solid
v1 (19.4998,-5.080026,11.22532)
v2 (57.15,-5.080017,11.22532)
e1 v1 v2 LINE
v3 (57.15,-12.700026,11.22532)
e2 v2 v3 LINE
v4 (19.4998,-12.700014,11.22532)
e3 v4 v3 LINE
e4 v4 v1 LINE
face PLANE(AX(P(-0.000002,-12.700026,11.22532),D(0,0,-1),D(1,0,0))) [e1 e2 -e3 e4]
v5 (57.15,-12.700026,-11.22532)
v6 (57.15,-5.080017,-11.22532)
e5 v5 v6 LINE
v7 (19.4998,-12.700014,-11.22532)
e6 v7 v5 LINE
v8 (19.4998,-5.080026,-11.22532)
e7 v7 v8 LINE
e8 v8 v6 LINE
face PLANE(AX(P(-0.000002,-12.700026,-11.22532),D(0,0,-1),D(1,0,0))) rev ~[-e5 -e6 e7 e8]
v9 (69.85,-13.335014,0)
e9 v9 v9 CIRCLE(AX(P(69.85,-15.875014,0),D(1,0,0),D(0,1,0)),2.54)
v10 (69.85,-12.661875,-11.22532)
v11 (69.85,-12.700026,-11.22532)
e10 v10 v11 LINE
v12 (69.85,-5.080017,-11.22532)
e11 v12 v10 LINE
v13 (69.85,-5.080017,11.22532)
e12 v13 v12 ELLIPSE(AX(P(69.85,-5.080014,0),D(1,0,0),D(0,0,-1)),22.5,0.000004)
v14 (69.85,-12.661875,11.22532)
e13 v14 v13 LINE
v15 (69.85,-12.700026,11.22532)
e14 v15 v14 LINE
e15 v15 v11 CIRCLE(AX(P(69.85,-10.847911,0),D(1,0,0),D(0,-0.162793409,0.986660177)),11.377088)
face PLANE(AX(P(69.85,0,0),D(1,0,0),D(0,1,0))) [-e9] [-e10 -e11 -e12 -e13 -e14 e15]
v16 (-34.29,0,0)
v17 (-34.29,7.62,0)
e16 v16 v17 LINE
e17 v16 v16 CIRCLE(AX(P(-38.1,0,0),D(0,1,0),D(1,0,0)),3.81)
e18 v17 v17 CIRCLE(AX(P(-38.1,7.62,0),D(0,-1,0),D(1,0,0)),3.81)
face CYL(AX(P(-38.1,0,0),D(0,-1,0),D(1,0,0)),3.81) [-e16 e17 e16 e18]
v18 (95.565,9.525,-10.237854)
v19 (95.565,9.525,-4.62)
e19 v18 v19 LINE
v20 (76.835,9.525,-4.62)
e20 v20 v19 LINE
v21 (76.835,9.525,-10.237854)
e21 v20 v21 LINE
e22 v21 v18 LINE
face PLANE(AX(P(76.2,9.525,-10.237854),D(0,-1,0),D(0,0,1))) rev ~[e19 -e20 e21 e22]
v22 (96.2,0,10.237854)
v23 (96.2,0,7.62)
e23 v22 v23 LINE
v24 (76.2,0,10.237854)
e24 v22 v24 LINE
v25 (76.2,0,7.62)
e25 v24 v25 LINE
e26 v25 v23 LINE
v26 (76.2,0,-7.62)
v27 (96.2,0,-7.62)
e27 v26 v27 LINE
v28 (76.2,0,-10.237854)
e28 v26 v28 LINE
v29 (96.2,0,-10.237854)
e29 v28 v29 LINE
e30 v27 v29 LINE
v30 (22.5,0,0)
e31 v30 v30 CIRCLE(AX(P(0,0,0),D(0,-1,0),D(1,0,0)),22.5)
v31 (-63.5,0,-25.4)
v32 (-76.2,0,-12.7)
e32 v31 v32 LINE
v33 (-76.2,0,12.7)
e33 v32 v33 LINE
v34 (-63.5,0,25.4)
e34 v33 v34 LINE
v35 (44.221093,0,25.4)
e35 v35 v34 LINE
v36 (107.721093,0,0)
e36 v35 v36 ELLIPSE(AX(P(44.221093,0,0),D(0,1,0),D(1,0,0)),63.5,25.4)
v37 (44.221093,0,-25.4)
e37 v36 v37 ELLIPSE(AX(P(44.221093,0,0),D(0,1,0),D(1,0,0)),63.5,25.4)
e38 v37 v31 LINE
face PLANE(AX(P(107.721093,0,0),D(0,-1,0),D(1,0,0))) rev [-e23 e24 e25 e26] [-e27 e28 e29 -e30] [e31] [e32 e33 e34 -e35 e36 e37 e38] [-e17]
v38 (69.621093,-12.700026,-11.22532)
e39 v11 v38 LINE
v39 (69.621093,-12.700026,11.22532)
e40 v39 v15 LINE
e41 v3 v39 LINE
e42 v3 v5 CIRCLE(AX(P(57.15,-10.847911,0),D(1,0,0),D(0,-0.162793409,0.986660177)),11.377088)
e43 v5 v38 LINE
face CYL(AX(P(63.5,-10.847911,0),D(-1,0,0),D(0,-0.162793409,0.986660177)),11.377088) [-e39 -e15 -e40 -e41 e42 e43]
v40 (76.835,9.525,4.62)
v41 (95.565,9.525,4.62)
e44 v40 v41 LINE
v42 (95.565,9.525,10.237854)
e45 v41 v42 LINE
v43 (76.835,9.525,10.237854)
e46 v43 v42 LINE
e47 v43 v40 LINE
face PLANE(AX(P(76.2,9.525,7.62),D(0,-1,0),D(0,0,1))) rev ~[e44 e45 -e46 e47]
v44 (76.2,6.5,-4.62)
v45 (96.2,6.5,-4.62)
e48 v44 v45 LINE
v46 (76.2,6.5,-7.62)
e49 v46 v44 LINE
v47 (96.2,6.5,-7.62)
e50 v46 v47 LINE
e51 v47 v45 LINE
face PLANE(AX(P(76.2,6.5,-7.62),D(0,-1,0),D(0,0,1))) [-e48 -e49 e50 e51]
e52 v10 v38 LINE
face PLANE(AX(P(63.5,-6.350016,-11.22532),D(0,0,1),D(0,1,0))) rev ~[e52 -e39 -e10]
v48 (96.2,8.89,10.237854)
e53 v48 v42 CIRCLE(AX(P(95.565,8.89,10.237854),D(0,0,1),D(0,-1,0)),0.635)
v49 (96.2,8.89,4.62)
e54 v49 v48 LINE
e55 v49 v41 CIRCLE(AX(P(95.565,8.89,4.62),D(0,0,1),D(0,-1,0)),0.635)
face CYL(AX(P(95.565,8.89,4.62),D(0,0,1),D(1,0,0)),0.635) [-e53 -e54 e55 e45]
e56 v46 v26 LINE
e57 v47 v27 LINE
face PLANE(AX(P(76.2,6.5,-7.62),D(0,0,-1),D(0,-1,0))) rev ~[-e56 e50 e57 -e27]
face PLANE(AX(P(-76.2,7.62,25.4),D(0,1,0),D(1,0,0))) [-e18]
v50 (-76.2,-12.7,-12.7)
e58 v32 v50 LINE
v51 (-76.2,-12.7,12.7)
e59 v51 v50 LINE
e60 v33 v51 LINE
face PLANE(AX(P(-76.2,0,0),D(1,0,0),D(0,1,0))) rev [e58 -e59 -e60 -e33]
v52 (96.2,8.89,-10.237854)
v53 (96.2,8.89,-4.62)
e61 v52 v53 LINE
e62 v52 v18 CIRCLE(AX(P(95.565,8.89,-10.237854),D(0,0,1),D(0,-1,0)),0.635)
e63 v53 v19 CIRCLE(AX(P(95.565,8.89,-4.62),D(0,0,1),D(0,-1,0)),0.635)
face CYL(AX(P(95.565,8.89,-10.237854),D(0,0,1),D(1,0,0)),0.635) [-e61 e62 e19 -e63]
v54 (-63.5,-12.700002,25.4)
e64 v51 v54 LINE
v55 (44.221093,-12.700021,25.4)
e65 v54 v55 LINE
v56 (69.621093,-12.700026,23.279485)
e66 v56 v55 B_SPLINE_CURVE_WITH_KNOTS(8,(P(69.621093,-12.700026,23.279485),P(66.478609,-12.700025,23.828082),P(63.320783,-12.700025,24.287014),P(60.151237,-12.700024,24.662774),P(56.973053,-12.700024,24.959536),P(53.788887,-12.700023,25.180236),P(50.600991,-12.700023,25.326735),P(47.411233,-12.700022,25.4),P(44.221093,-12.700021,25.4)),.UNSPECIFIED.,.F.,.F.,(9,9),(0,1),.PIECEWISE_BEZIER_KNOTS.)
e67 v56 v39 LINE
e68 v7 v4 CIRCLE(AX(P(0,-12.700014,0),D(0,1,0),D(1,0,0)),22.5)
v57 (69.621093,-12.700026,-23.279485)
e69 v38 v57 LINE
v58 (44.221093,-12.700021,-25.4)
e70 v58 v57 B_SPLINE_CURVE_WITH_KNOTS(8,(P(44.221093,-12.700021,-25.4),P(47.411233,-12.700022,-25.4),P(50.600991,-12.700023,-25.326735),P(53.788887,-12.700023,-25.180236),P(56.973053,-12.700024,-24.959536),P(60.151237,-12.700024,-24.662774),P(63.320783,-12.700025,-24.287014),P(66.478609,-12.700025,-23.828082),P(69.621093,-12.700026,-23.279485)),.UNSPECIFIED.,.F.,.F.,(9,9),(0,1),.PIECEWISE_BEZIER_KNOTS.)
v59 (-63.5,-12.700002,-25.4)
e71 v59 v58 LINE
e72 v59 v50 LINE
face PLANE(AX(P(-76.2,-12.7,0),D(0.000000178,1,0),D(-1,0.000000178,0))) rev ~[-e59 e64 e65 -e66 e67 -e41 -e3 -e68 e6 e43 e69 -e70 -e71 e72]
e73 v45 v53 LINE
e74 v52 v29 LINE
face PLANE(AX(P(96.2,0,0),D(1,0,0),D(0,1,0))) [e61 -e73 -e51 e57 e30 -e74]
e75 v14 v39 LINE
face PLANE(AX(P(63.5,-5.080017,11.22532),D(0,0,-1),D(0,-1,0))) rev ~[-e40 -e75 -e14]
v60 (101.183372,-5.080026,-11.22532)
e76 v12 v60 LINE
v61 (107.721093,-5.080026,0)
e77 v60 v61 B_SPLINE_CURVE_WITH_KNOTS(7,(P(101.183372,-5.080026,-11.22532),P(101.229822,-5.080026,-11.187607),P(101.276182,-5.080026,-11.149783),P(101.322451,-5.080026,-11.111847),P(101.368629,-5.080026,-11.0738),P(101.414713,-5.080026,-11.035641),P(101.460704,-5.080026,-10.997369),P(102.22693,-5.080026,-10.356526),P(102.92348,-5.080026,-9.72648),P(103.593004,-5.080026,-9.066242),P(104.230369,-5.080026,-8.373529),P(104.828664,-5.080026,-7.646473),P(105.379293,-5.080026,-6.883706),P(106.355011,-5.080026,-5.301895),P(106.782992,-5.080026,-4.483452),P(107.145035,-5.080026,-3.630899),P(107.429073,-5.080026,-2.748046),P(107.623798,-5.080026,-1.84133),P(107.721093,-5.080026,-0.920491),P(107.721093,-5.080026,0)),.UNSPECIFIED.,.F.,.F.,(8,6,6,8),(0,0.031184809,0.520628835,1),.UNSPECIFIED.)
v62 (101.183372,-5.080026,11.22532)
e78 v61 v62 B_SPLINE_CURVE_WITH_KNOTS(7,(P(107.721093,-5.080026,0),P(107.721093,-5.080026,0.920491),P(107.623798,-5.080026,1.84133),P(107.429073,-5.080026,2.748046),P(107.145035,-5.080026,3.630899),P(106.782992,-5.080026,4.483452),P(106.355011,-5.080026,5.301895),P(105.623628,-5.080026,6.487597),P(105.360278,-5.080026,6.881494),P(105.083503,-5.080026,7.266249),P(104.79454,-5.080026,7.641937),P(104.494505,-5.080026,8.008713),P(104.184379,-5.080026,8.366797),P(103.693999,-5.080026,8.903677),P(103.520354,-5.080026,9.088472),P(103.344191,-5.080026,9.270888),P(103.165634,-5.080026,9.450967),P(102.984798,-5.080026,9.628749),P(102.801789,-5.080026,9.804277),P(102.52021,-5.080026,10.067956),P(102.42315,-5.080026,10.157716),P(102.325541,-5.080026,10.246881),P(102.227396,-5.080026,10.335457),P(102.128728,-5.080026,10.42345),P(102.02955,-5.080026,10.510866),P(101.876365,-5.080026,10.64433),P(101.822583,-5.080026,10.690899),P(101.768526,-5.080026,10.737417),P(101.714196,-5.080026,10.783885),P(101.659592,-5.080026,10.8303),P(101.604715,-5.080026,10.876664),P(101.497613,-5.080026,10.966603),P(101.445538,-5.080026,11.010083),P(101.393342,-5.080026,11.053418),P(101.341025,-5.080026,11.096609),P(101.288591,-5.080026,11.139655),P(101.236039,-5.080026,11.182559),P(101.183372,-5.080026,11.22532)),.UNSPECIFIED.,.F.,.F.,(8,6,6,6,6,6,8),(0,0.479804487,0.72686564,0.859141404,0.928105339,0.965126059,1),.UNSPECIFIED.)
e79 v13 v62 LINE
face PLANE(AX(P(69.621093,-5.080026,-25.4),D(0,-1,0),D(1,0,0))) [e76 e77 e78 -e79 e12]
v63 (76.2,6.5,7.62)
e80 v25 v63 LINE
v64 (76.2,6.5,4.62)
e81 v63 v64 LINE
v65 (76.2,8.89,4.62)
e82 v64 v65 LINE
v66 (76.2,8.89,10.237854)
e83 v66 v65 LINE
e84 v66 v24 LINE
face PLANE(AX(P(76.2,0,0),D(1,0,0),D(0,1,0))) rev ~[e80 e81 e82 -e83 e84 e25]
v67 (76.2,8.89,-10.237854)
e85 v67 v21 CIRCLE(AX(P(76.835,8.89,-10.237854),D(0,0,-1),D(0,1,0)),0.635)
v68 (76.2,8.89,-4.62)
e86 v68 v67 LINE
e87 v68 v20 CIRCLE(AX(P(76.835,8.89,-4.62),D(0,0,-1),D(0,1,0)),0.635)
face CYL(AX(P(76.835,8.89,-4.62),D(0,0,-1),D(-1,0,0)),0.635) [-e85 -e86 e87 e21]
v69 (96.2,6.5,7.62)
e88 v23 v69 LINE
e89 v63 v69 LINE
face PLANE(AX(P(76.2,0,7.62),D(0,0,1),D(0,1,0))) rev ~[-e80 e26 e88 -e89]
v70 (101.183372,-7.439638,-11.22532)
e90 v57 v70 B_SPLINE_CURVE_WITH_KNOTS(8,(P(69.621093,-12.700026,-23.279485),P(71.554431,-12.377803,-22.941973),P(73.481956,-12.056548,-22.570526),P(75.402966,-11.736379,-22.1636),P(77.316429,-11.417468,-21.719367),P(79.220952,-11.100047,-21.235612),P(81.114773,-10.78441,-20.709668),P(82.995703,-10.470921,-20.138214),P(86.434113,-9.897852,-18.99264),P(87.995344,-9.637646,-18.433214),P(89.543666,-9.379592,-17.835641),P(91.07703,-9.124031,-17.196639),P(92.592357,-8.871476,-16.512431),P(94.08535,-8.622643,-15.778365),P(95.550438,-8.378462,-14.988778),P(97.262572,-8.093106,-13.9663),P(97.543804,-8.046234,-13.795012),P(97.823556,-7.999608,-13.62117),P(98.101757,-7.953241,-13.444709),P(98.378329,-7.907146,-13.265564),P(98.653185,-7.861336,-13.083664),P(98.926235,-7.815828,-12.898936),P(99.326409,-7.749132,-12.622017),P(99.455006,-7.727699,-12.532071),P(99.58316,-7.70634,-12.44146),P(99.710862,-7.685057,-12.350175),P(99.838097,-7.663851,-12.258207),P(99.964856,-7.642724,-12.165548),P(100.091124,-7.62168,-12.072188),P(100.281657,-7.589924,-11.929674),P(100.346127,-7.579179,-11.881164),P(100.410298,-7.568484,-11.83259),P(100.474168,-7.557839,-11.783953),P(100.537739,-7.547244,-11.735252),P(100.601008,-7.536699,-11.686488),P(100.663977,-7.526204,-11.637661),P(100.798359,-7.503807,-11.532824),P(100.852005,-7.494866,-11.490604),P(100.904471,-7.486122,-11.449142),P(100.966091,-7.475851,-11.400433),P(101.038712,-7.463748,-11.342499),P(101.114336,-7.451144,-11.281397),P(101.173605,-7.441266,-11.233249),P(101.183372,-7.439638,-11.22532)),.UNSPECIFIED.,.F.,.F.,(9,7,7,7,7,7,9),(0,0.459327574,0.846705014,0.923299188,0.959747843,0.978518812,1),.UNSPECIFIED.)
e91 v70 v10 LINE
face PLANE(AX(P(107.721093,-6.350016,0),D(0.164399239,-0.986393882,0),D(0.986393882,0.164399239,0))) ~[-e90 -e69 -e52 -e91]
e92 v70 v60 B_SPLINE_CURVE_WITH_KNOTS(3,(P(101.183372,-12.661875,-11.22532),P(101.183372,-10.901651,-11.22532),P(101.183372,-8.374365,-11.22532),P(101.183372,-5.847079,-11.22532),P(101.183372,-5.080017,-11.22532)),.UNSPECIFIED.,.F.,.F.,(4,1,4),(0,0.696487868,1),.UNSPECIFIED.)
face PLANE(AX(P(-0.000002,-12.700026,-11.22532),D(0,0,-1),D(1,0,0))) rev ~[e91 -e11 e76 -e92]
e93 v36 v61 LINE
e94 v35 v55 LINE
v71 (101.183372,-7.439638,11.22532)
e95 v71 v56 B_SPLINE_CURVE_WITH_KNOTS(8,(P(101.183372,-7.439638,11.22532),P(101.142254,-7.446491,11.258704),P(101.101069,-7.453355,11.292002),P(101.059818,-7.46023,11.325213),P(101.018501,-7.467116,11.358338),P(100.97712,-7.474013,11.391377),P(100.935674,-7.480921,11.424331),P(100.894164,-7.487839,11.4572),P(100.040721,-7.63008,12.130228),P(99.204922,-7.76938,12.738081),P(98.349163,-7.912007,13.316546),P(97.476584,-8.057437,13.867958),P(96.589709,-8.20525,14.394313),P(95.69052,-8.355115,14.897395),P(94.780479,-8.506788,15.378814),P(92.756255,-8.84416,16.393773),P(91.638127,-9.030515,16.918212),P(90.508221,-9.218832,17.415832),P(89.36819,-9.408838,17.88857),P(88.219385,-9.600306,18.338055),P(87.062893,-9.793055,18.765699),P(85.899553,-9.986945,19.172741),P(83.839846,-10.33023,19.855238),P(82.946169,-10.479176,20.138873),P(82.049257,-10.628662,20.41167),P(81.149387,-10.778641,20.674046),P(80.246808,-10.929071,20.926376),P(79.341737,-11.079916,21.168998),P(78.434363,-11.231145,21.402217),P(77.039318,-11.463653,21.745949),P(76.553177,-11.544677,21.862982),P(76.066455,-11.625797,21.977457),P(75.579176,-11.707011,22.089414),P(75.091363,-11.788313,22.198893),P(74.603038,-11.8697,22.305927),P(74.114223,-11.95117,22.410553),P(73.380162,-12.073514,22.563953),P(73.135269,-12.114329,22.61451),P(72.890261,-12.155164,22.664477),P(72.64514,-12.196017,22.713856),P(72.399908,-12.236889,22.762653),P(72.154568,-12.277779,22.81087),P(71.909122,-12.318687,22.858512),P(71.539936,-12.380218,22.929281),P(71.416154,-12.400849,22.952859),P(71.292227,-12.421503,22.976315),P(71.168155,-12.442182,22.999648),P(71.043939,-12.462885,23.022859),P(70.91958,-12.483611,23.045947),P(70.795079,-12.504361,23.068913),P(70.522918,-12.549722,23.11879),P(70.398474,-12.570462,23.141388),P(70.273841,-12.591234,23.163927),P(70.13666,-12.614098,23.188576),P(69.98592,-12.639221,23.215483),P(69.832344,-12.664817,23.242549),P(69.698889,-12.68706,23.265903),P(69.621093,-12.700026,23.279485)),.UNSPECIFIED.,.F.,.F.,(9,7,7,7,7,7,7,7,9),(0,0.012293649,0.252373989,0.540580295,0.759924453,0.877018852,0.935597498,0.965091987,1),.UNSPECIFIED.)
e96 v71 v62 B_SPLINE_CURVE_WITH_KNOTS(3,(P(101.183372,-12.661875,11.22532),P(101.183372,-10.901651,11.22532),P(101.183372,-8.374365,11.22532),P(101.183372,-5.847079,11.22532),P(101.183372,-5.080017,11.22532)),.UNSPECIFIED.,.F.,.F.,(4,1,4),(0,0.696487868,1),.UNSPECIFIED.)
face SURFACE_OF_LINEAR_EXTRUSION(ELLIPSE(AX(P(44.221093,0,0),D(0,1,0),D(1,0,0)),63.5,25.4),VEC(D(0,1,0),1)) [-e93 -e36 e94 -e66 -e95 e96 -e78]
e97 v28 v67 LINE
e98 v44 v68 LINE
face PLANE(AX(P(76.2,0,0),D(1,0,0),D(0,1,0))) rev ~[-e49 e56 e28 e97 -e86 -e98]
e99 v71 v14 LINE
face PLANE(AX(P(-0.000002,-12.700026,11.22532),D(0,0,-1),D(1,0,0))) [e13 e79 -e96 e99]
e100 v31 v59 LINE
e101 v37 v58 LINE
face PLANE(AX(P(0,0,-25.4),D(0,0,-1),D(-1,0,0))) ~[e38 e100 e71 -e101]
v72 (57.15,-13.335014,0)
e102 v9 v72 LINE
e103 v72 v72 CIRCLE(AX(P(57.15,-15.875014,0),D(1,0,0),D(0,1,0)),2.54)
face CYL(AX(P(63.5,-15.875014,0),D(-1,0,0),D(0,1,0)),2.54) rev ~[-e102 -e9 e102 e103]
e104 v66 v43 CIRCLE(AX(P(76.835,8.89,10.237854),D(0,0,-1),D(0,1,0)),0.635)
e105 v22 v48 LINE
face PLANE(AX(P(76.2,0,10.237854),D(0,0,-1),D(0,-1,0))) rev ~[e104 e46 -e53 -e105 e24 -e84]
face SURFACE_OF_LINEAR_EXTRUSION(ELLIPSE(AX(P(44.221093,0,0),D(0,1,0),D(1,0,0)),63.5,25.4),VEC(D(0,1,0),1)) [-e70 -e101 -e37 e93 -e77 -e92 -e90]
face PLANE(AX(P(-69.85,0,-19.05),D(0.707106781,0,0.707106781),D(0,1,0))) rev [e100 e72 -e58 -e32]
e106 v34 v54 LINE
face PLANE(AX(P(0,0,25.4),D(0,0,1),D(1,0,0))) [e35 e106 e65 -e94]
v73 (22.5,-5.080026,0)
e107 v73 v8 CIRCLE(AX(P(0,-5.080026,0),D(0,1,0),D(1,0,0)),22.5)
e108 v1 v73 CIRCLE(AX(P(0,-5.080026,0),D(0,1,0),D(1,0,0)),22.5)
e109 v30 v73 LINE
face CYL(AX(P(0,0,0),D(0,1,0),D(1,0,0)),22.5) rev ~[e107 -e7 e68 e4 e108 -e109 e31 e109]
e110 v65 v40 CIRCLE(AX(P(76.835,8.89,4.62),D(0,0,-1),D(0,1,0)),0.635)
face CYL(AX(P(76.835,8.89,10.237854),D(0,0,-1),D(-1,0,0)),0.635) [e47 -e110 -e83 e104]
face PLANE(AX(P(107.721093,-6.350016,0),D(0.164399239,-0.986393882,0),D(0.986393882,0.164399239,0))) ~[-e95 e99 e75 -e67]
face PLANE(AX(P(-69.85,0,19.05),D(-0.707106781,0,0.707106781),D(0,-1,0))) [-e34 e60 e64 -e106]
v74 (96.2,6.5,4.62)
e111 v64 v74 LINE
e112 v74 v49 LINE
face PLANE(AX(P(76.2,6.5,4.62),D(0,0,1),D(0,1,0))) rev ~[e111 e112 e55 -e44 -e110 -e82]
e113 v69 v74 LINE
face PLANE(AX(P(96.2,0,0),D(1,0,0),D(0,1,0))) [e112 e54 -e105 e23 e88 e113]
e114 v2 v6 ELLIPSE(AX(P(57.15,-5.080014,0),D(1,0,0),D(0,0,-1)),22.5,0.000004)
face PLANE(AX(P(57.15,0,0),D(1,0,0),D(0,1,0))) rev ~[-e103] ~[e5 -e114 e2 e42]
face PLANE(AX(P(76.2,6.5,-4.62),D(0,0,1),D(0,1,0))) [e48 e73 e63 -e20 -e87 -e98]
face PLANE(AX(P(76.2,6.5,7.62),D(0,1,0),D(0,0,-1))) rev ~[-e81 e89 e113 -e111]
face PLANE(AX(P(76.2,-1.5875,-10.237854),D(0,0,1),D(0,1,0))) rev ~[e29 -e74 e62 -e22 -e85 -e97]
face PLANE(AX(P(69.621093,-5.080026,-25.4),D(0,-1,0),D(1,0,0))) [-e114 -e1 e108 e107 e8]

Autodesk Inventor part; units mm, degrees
ref_plane "XZ Plane" through (0, 0, 0) normal (0, 1, 0) x (-1, 0, 0)
sketch "Sketch1" plane through (0, 0, 0) normal (0, 0, 1) x (1, 0, 0)
  line L0 (107.721093, 0) -> (-76.2, 0)
  line L1 (-76.2, 0) -> (-76.2, -12.7)
  line L2 (-76.2, -12.7) -> (69.621093, -12.700026)
  line L3 (107.721093, -6.350016) -> (107.721093, 0)
  line L4 (107.721093, -6.350016) -> (69.621093, -12.700026)
  point P0 (0, 0)
  dimension "d19" = 183.92109
  dimension "d20" = 76.2
  dimension "d21" = 12.7
  dimension "d22" = 38.1
extrude "Extrusion2" add sketch "Sketch1" along normal blind 25.4
sketch "Sketch2" plane through (-76.2, 0, 0) normal (0, 1, 0) x (1, 0, 0)
  circle A0 centre (76.2, 0) radius 22.5
  dimension "d25" = 45
extrude "Extrusion3" cut sketch "Sketch2" against normal through all
mirror "Mirror1" about plane through (14.352169, -5.990033, 0) normal (0, 0, -1) of "Extrusion2", "Extrusion3"
sketch "Sketch4" plane through (-76.2, 0, 25.4) normal (0, 1, 0) x (1, 0, 0)
  circle A0 centre (38.1, 25.4) radius 3.81
  line L0 (-36.784219, 25.4) -> (220.705311, 25.4)
  point P0 (76.2, 25.4)
  dimension "d13" = 7.62
  dimension "d39" = 38.1
extrude "Extrusion5" add sketch "Sketch4" along normal blind 7.62
ref_plane "Work Plane1" through (76.2, 0, 0) normal (1, 0, 0) x (0, 1, 0)
sketch "Sketch10" plane through (69.621093, -12.700026, -25.4) normal (-0.0000002, -1, 0) x (1, -0.0000002, 0)
  line L0 (-69.621095, 36.62532) -> (38.099999, 36.62532)
  line L1 (-69.621095, 14.17468) -> (38.1, 14.17468)
  circle A0 centre (-69.621095, 25.4) radius 11.22532
  line L2 (-69.621095, 36.62532) -> (-69.621095, 14.17468) construction
  line L3 (38.099999, 0) -> (38.099999, 50.8) construction
  line L4 (38.099999, 36.62532) -> (38.1, 14.17468)
  point P0 (-69.621095, 25.4)
extrude "Extrusion11" cut sketch "Sketch10" against normal mid plane 15.24
ref_plane "Work Plane4" through (63.5, 0, 0) normal (1, 0, 0) x (0, 1, 0)
sketch "Sketch5" plane through (76.2, 0, 0) normal (1, 0, 0) x (0, 1, 0)
  line L0 (-1.5875, -10.237854) -> (9.525, -10.237854)
  line L1 (9.525, -10.237854) -> (9.525, 10.237854)
  line L2 (9.525, 10.237854) -> (-1.5875, 10.237854)
  line L3 (-1.5875, 10.237854) -> (-1.5875, -10.237854)
  line L4 (9.525, -7.62) -> (0, -7.62)
  line L5 (0, -7.62) -> (0, 7.62)
  line L6 (0, 7.62) -> (9.525, 7.62)
  line L7 (9.525, 7.62) -> (9.525, -7.62)
  line L8 (0, 25.4) -> (0, -25.4)
  line L9 (9.525, -7.62) -> (6.5, -7.62)
  line L10 (6.5, -7.62) -> (6.5, -4.62)
  line L11 (6.5, -4.62) -> (9.525, -4.62)
  line L12 (9.525, -4.62) -> (9.525, -7.62)
  line L13 (9.525, 7.62) -> (6.5, 7.62)
  line L14 (6.5, 7.62) -> (6.5, 4.62)
  line L15 (6.5, 4.62) -> (9.525, 4.62)
  line L16 (9.525, 4.62) -> (9.525, 7.62)
  point P0 (0, 0)
  point P1 (0, 0)
  point P2 (9.525, 0)
  dimension "d14" = 15.24
  dimension "d50" = 6.5
  dimension "d51" = 3
  dimension "d52" = 3
extrude "Extrusion6" add sketch "Sketch5" along normal blind 20 contours L3 L2 L8 L5 L0 | L8 L4 L1 L0 | L2 L1 L6 L8 | L4 L10 L11 L1 | L6 L1 L15 L14
fillet "Fillet1" radius 0.635 4 edges at (96.2, 9.525, 7.4289) (76.2, 9.525, 7.4289) (76.2, 9.525, -7.4289) (96.2, 9.525, -7.4289)
chamfer "Chamfer1" distance 12.7 angle 45 2 edges at (-76.2, -6.35, -25.4) (-76.2, -6.35, 25.4)
sketch "Sketch11" plane through (63.5, 0, 0) normal (1, 0, 0) x (0, 1, 0)
  line L0 (-5.080017, 11.22532) -> (-12.700026, 11.22532)
  ellipse E0 centre (-5.080014, 0) end of major axis (-5.080014, -22.5) minor radius 0.000004 (-5.080017, 11.22532) -> (-5.080017, -11.22532) ccw
  line L1 (-12.700026, -11.22532) -> (-5.080017, -11.22532)
  line L2 (-12.700026, 11.22532) -> (-6.350016, 11.22532)
  line L3 (-6.350016, 11.22532) -> (-5.080033, 11.22532)
  line L4 (-5.080033, 11.22532) -> (-5.080033, -11.22532)
  line L5 (-6.350016, -11.22532) -> (-12.700026, -11.22532)
  arc A0 (-12.700026, 11.22532) -> (-12.700026, -11.22532) centre (-10.847911, 0) ccw
  circle A1 centre (-15.875014, 0) radius 2.54
  ellipse E1 centre (-12.700014, 0) end of major axis (-12.700014, 22.5) minor radius 0.000004 (-12.700026, -11.22532) -> (-12.700026, 11.22532) ccw
  point P0 (0, 0)
  dimension "d48" = 3.175
  dimension "d49" = 5.08
extrude "Extrusion12" add sketch "Sketch11" along normal mid plane 12.7
sketch "Sketch12" plane through (107.721093, 0, 25.4) normal (0, 1, 0) x (1, 0, 0)
  line L0 (-171.221093, 50.8) -> (0, 50.8)
  line L1 (0, 0) -> (0, 50.8)
  line L2 (-171.221093, 0) -> (0, 0)
  line L3 (0, 25.4) -> (-107.721093, 25.4) construction
  ellipse E0 centre (-63.5, 25.4) end of major axis (0, 25.4) minor radius 25.4 (-63.5, 0) -> (-63.5, 50.8) ccw
extrude "Extrusion13" cut sketch "Sketch12" against normal through all
properties part number "Guide" material "UHMW, Black"
